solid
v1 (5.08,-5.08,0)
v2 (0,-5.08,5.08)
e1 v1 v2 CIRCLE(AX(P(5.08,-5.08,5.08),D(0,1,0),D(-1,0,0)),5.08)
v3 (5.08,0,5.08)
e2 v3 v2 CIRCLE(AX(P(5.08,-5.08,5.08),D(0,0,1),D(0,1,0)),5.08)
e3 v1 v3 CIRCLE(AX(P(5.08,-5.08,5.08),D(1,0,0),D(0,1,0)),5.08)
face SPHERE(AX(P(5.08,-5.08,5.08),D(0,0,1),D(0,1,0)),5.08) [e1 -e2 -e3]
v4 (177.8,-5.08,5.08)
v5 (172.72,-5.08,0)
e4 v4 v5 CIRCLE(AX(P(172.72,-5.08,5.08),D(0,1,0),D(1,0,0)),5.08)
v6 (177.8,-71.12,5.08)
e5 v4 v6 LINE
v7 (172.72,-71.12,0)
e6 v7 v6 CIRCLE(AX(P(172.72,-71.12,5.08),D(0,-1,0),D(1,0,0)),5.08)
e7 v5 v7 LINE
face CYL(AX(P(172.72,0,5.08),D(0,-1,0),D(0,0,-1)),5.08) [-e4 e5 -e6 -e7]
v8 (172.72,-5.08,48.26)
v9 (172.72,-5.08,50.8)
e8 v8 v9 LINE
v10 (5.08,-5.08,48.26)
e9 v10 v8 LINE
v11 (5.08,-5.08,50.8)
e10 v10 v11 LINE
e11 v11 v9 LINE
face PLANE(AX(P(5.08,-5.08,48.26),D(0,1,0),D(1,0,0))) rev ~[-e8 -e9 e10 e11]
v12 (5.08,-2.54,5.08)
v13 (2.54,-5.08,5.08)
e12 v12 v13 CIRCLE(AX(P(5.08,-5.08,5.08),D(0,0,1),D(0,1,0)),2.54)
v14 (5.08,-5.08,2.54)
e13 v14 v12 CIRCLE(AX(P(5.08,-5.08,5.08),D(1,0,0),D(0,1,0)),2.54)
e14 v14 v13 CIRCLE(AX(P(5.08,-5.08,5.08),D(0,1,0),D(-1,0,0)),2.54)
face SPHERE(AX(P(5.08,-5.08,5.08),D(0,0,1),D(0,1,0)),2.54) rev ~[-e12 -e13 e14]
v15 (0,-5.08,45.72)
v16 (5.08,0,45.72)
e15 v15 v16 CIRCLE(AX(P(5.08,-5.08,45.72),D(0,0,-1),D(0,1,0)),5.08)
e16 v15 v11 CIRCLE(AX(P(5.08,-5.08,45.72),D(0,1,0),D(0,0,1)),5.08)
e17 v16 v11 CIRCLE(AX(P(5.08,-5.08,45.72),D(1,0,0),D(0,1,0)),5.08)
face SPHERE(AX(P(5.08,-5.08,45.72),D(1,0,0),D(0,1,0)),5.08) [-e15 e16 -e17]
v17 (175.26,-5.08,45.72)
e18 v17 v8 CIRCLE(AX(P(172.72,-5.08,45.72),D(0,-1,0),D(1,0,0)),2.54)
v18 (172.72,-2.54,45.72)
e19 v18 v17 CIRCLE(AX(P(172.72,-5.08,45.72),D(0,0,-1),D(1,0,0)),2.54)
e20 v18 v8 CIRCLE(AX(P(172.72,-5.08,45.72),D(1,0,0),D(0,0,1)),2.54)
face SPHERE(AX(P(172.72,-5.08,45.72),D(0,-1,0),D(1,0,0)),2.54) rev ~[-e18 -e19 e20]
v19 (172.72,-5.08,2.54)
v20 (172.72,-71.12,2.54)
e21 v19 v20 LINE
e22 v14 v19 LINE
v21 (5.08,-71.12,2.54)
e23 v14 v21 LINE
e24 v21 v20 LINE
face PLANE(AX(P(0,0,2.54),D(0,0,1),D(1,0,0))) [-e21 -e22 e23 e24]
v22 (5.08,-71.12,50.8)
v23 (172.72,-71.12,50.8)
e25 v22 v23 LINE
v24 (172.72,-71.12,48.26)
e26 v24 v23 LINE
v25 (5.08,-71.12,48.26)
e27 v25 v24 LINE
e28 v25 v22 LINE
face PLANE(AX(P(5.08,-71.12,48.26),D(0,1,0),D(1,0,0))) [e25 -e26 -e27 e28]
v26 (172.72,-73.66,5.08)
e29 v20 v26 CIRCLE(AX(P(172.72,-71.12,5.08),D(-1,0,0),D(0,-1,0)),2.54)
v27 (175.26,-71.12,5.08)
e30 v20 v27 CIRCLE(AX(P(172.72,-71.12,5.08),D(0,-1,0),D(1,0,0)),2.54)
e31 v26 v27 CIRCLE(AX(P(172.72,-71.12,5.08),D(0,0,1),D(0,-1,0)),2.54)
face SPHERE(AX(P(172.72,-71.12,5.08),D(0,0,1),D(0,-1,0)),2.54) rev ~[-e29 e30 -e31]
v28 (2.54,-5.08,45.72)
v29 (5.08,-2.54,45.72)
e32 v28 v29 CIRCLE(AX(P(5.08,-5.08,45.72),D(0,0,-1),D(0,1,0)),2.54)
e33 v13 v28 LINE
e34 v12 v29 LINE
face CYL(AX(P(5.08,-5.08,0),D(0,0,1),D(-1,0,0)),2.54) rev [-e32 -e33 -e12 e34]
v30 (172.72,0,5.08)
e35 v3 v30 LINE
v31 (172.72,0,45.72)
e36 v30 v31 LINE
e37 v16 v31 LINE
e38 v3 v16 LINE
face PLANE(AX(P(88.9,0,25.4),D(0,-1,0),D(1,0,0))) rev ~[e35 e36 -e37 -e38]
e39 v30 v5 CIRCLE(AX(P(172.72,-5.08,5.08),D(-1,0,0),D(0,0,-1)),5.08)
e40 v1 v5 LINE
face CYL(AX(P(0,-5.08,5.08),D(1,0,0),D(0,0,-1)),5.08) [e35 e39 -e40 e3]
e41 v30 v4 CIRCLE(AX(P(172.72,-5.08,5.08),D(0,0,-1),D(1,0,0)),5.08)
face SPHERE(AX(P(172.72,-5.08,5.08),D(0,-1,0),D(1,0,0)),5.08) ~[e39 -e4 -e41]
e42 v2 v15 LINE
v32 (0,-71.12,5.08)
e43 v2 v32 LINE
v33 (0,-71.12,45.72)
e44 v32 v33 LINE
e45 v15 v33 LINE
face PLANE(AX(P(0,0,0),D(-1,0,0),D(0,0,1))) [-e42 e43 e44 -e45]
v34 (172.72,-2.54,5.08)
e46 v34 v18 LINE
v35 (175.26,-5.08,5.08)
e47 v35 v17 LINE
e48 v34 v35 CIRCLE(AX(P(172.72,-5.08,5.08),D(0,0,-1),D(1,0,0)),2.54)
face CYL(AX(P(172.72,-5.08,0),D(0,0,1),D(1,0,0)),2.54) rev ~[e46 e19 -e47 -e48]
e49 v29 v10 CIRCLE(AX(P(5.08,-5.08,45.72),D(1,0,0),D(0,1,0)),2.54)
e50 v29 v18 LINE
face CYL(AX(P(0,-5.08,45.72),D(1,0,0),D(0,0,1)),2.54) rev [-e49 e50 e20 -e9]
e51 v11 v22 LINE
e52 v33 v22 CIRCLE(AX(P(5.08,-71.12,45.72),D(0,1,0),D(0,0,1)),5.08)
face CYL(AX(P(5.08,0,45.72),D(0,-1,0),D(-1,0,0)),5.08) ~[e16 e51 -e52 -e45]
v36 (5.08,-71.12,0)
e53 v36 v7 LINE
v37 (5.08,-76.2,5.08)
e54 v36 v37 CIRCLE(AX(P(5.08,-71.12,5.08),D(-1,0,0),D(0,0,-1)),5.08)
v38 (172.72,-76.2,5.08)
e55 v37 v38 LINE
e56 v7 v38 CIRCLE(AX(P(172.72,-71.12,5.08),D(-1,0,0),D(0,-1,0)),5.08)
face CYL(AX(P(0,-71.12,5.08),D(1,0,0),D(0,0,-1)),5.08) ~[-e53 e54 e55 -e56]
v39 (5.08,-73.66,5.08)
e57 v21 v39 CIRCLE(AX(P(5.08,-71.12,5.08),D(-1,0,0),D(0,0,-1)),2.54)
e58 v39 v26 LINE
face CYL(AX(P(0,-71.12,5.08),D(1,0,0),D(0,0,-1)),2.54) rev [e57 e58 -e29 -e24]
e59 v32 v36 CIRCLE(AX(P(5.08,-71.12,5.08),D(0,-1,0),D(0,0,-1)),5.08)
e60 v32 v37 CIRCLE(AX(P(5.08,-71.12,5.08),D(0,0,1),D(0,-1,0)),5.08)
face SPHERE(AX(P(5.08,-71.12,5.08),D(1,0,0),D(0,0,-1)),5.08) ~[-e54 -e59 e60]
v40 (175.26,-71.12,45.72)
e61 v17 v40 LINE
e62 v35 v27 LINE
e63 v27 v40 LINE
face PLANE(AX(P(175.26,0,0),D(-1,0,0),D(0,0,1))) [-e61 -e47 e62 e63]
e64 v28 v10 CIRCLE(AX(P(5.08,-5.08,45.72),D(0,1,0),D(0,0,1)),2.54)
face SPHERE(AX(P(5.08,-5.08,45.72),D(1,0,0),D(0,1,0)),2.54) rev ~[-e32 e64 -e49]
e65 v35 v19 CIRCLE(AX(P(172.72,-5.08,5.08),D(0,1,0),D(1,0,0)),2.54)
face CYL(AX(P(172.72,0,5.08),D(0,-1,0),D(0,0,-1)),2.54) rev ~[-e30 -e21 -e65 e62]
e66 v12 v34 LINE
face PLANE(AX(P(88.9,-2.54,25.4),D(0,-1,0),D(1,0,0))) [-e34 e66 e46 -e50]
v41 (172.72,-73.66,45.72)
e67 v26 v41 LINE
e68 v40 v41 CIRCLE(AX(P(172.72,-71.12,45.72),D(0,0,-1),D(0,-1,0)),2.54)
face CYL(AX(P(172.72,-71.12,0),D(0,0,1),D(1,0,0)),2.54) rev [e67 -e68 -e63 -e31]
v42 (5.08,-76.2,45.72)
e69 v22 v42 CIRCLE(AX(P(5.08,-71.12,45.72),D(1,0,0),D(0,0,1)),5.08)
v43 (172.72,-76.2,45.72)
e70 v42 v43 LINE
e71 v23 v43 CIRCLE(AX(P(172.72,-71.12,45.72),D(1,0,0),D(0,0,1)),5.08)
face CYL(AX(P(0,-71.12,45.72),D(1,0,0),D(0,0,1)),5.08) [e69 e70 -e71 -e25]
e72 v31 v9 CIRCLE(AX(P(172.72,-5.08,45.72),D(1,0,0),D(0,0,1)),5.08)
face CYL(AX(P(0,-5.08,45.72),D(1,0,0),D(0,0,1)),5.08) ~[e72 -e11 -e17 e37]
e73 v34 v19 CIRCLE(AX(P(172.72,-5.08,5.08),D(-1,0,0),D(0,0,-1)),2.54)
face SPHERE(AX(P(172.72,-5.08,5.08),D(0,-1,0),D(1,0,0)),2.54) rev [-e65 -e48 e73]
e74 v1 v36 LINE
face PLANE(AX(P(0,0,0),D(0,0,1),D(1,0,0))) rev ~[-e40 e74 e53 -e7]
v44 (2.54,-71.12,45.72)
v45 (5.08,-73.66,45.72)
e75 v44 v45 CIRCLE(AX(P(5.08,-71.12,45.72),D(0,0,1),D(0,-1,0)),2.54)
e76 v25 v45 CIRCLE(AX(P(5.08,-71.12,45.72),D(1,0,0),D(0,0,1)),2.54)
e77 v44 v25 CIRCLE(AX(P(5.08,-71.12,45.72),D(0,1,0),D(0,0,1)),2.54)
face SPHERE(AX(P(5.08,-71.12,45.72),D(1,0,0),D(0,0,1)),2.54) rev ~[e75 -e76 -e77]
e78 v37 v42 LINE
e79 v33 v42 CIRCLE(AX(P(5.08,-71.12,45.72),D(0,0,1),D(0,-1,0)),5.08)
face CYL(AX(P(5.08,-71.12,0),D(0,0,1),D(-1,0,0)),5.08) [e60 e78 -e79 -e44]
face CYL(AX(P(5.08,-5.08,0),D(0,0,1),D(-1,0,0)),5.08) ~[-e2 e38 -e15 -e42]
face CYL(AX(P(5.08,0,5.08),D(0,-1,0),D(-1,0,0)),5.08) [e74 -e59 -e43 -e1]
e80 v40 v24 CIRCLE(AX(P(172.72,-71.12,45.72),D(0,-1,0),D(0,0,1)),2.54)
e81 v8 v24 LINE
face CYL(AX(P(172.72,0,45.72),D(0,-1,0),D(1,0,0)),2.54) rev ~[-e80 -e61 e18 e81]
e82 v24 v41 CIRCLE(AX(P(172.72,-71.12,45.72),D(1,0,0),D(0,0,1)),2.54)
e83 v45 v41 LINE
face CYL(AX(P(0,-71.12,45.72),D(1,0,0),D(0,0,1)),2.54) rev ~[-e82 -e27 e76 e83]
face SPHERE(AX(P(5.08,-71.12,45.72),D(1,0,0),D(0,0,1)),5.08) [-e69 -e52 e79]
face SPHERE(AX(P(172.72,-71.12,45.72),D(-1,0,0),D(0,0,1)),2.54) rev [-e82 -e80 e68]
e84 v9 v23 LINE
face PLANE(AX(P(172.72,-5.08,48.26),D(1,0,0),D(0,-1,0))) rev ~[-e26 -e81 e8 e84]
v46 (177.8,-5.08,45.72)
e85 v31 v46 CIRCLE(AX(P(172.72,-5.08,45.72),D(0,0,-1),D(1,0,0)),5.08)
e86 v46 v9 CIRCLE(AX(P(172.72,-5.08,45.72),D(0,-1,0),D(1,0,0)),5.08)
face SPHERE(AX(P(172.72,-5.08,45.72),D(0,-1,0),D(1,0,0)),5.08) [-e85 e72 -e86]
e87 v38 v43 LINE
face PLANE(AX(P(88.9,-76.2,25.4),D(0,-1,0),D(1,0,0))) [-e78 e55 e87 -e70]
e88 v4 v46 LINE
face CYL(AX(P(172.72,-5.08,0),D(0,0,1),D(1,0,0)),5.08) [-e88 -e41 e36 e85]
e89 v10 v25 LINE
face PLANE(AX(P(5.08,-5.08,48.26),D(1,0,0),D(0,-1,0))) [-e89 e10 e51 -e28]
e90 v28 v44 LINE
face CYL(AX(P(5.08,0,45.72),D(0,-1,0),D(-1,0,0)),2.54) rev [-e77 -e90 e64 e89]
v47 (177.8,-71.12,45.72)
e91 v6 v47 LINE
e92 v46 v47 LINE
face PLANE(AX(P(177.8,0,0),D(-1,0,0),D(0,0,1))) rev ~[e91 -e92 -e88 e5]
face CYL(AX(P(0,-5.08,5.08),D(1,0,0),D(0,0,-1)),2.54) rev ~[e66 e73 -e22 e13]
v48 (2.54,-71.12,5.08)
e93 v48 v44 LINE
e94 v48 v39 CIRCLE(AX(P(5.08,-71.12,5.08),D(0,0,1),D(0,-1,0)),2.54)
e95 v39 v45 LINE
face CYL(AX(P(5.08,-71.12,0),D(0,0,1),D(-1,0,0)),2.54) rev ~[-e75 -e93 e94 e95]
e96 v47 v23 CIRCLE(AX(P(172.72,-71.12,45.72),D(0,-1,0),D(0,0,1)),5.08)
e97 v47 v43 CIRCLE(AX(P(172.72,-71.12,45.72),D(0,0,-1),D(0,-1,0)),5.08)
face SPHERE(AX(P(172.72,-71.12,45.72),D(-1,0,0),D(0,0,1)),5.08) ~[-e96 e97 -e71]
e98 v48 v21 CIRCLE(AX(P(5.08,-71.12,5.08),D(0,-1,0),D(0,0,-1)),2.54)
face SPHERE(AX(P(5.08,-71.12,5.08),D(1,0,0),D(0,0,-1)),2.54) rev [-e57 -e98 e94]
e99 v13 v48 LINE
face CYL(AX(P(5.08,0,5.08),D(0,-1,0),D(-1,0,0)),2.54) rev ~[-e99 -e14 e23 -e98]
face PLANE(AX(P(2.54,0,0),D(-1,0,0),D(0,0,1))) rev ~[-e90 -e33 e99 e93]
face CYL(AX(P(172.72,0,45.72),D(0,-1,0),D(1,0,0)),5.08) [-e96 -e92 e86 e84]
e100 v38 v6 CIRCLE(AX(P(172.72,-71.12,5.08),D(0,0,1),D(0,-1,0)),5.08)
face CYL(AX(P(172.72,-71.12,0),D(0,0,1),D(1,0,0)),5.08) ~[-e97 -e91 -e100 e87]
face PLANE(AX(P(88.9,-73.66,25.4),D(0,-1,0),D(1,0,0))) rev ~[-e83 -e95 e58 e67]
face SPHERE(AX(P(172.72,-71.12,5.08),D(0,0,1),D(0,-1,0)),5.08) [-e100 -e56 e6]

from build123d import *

# Parameters (mm, degrees)
F0_W     = 177.8
F0_H     = 50.8
F1_DEPTH = 76.2
F2_R     = 5.08
F3_T     = -2.54


# Not quite as in the source:
# - a shell that OpenCascade refuses in one call is made with other operations: the cavity is built on its own and cut out


with BuildPart() as f1:
    # F0 (on Front) → F1 (new body)
    with BuildSketch(Plane.XZ):
        with Locations((88.9, 25.4)):
            Rectangle(F0_W, F0_H)
    extrude(amount=F1_DEPTH)

    # F2
    f2_edges = [f1.edges().sort_by_distance(p)[0] for p in [
        (88.9, -76.2, 50.8),
        (177.8, -38.1, 50.8),
        (177.8, -76.2, 25.4),
        (88.9, -76.2, 0),
        (177.8, -38.1, 0),
        (177.8, 0, 25.4),
        (88.9, 0, 50.8),
        (0, 0, 25.4),
        (88.9, 0, 0),
        (0, -38.1, 50.8),
        (0, -38.1, 0),
        (0, -76.2, 25.4),
    ]]
    fillet(f2_edges, radius=F2_R)

    # F3: a shell. OpenCascade refuses it in one call, so the cavity is built on its own and cut out:
    # the body offset inwards by the wall thickness, plus a prism from it out through each open face.
    f3_core = offset(f1.part, amount=F3_T, mode=Mode.PRIVATE)
    f3_exits = [f3_core.faces().sort_by_distance(p)[0] for p in [
        (88.9, -38.1, 48.26),
    ]]
    add(f3_core, mode=Mode.SUBTRACT)
    extrude(f3_exits, amount=-F3_T, mode=Mode.SUBTRACT)


solid = f1.part
